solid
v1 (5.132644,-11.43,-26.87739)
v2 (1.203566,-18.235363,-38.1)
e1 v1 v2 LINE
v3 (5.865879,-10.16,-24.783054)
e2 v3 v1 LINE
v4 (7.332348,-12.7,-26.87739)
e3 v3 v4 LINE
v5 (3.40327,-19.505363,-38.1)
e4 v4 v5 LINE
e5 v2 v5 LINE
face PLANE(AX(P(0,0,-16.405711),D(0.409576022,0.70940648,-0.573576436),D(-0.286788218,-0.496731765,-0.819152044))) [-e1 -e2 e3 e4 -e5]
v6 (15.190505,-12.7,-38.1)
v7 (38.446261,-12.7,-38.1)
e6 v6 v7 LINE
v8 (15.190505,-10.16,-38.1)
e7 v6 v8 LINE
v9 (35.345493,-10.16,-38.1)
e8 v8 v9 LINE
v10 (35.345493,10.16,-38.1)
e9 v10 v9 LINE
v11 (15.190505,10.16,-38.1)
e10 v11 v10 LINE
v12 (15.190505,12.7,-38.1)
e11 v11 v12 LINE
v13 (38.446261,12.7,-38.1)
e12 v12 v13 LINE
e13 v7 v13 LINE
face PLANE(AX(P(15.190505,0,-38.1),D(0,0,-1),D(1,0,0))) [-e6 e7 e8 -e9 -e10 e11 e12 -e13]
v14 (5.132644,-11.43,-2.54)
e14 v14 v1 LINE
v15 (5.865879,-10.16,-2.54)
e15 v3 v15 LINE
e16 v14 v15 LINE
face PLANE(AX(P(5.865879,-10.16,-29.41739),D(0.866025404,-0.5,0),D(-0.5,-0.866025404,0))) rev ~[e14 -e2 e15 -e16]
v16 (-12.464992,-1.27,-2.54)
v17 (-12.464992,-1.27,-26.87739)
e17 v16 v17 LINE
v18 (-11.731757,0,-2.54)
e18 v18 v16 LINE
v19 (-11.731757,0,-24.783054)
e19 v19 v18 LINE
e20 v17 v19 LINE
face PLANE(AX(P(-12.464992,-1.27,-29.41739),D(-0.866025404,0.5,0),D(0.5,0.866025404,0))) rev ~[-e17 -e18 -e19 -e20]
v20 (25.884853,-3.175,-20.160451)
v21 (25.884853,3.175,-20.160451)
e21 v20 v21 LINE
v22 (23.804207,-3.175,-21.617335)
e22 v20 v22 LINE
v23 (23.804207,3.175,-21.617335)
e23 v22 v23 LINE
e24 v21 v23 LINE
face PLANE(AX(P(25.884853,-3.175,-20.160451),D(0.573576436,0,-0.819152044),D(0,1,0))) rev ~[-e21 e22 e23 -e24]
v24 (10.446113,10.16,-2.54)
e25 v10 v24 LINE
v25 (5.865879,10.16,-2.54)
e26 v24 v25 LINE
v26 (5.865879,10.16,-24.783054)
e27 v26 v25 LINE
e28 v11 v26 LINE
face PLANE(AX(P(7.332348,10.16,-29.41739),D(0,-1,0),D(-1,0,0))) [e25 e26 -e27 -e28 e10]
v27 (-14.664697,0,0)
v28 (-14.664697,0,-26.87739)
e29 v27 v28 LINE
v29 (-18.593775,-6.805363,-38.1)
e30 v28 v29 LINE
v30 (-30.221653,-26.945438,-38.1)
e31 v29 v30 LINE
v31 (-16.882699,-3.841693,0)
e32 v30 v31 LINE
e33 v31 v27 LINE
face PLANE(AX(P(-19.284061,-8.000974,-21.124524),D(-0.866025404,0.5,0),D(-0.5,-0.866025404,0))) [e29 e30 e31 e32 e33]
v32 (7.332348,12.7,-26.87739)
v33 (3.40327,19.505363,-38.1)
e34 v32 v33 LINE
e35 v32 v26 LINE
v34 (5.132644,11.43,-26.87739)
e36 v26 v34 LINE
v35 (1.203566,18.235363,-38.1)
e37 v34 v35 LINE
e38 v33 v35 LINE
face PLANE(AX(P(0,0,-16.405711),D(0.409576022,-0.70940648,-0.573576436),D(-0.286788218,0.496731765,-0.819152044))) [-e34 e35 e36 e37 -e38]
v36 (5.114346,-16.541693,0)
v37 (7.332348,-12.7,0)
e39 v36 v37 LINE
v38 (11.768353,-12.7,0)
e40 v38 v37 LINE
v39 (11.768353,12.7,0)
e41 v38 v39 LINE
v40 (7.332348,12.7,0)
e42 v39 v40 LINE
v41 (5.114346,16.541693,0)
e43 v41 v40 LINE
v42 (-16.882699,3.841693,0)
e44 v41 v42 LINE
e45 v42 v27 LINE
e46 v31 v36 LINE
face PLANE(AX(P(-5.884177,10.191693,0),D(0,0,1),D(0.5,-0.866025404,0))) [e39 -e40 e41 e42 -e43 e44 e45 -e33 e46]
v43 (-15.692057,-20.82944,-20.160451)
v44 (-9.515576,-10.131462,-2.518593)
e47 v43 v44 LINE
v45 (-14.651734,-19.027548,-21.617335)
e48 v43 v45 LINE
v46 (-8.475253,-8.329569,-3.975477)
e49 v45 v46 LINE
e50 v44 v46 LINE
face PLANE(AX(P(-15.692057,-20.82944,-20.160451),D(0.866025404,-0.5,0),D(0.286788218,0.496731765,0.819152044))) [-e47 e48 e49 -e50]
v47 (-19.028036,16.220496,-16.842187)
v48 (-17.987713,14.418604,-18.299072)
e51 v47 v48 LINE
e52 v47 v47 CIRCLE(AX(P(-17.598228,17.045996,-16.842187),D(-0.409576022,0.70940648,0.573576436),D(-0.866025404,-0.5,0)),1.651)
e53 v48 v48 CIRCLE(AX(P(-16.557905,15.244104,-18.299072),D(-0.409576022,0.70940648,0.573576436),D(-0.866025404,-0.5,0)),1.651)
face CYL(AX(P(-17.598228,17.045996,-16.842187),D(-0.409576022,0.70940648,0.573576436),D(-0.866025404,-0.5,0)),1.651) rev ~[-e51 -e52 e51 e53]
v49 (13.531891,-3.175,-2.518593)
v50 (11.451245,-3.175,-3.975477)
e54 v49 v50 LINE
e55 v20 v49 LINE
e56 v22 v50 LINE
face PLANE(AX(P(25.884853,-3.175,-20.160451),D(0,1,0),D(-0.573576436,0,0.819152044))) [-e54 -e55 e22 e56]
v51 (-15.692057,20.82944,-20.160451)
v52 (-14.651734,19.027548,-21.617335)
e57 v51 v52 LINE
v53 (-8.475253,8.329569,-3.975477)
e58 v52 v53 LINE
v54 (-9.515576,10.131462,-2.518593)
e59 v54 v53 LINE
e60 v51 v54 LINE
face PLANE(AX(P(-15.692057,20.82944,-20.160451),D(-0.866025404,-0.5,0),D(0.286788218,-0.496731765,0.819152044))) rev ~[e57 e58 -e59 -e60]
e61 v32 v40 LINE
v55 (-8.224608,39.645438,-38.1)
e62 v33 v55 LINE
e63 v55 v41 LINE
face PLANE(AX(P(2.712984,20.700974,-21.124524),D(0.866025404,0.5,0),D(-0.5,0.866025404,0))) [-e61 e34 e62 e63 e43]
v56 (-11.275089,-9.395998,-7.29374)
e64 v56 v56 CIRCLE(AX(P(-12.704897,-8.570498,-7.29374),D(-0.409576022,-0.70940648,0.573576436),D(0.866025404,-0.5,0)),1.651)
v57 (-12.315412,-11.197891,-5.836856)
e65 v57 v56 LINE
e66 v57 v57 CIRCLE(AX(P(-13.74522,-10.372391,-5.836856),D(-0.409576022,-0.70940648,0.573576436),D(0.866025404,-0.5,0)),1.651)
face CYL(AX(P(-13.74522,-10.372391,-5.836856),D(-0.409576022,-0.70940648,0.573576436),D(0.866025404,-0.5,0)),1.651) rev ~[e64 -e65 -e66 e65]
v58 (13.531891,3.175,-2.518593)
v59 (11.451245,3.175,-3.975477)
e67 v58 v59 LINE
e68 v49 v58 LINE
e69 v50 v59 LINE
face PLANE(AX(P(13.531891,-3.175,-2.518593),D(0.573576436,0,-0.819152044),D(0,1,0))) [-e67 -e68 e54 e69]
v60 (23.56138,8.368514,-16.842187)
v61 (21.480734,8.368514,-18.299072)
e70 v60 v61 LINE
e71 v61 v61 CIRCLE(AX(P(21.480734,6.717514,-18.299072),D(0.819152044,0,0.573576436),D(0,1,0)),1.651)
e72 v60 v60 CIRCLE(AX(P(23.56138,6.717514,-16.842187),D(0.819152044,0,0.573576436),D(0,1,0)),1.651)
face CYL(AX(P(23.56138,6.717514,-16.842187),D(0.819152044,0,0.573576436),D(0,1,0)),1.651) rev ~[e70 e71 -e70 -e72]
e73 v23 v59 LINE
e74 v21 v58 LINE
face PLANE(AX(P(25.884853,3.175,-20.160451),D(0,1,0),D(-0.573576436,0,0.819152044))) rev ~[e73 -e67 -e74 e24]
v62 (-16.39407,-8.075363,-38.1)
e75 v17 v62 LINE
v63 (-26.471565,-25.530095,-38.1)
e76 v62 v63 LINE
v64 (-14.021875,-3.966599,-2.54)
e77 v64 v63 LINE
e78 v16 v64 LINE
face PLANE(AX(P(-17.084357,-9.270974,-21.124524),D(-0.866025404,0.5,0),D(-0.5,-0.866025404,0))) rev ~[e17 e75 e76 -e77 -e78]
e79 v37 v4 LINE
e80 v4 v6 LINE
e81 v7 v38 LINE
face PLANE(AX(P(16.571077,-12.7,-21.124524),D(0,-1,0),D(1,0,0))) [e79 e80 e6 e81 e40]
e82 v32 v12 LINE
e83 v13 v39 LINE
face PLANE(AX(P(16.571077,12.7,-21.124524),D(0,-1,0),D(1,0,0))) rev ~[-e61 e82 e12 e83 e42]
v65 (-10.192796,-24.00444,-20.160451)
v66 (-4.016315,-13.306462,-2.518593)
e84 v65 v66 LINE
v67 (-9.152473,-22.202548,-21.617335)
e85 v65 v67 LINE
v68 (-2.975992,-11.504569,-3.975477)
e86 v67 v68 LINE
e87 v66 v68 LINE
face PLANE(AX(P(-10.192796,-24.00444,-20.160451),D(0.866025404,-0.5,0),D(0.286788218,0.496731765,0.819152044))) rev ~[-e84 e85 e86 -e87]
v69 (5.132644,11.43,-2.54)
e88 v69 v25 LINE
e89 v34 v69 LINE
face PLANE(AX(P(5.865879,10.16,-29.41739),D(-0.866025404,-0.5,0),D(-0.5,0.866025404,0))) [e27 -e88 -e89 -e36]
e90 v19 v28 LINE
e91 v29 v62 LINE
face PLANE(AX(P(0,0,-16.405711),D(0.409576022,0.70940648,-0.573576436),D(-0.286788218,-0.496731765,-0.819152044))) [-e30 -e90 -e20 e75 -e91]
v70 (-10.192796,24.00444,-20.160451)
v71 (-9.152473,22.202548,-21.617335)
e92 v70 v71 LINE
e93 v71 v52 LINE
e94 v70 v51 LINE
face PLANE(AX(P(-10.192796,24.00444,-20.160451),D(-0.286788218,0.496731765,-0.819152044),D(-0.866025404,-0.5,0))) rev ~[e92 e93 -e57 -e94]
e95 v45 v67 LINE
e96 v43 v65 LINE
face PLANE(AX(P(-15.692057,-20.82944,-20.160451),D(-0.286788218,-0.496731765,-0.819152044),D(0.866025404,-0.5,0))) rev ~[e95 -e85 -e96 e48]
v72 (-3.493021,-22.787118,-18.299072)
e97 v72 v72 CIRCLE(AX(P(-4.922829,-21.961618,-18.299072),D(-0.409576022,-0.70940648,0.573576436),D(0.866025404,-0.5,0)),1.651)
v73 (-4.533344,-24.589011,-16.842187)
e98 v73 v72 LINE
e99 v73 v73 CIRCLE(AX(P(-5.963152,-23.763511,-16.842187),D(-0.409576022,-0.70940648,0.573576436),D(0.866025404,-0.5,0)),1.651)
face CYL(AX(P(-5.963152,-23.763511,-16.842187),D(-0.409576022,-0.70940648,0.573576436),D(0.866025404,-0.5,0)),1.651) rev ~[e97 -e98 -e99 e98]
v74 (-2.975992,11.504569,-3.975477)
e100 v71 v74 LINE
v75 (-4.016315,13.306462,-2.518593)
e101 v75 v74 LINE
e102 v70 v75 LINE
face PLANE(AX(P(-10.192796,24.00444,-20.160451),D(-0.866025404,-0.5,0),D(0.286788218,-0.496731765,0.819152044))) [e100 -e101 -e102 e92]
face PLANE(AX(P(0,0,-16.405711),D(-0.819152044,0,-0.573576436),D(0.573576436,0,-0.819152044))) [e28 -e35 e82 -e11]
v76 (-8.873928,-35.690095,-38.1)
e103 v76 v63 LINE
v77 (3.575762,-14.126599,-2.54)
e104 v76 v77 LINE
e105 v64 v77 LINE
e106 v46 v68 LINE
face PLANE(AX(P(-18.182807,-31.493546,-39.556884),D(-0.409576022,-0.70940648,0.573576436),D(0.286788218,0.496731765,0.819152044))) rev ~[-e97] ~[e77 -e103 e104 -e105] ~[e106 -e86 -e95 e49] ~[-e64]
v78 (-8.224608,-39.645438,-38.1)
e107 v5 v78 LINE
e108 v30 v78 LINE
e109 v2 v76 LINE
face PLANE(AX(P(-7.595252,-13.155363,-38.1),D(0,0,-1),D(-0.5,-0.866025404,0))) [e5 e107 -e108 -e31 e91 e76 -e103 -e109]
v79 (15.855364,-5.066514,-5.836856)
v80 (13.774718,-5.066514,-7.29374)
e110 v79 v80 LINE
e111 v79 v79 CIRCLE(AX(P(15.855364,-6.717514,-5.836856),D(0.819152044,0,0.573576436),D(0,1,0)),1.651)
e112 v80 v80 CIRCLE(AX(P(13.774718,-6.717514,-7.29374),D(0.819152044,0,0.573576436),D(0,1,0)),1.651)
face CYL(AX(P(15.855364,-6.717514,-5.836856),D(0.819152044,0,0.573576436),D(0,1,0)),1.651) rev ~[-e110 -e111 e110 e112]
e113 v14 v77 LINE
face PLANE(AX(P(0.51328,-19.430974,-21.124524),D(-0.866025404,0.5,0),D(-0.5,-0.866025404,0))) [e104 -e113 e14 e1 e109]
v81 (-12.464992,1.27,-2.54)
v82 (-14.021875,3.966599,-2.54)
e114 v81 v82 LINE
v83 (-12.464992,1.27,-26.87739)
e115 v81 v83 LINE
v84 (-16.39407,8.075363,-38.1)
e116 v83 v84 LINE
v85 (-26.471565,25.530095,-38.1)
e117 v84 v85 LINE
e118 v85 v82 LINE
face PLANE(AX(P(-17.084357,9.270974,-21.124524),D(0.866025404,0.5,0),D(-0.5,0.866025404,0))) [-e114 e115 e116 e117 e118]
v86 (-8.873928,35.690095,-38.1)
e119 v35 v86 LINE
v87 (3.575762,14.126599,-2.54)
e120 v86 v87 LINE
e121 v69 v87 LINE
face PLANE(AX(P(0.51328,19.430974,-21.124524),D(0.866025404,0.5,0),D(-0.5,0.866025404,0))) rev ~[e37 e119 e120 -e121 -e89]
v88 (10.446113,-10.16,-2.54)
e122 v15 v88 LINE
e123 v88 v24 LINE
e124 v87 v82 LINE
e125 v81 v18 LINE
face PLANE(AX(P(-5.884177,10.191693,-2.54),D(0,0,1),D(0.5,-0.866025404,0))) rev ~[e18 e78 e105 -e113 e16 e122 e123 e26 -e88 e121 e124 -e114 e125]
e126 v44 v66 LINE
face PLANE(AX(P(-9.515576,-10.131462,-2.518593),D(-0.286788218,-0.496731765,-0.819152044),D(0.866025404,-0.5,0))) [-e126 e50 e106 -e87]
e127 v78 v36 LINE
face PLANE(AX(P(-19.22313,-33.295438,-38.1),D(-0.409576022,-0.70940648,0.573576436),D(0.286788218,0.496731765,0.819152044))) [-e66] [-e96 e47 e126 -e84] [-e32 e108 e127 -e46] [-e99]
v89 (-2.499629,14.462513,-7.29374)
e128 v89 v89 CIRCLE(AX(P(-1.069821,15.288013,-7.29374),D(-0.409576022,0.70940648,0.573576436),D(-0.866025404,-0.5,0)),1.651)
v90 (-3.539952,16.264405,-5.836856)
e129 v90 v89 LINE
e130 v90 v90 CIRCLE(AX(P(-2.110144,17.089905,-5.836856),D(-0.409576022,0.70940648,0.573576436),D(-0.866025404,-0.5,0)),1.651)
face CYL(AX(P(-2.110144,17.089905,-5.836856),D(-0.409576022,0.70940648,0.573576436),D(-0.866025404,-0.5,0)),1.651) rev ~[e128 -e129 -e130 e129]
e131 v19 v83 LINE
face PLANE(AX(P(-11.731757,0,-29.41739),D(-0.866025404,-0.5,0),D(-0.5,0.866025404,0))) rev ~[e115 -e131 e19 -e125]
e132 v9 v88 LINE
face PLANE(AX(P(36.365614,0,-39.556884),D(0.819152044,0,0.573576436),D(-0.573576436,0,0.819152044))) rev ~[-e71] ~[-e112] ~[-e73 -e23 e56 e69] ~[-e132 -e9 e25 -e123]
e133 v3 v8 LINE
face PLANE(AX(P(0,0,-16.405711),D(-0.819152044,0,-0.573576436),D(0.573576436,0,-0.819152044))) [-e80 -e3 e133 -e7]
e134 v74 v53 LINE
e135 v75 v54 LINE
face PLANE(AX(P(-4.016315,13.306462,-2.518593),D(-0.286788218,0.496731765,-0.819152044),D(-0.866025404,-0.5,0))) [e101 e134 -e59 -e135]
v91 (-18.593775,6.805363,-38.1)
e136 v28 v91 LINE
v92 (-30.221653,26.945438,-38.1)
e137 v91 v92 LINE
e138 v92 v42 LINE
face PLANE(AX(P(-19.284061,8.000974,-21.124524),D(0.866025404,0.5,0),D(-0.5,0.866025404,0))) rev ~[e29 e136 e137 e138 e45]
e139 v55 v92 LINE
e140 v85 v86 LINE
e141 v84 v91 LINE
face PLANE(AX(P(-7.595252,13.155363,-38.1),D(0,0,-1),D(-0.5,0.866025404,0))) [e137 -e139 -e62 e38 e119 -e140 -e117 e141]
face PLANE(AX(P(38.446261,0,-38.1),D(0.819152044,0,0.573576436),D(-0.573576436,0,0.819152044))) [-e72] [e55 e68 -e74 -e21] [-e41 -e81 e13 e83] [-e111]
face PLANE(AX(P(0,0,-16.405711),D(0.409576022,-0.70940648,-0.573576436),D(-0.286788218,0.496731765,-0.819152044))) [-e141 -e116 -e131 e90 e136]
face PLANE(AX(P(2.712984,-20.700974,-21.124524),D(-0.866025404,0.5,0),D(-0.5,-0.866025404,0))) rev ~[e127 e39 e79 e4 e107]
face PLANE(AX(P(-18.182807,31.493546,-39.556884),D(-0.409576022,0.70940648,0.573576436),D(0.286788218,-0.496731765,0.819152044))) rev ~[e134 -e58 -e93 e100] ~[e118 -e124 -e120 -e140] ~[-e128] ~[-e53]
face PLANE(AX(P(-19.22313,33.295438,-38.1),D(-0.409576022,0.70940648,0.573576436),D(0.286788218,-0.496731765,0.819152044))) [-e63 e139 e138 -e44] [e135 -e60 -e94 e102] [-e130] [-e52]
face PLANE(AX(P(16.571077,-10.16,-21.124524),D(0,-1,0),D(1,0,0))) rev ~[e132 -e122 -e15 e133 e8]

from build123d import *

# Parameters (mm, degrees)
F1_DEPTH        = 12.7
F3_COUNT        = 3
F4_T            = 2.54
F4_T3_DEPTH     = 31.9573897847
F5_W            = 6.35
F5_H            = 21.5367313986
F5_R            = 1.651
F6_DEPTH        = 2.54
F6_COPIES_COUNT = 3


# Not quite as in the source:
# - a pattern or mirror of a feature is missing from the dataset's text; its kind, count and spacing are read off the source's solid
# - a shell that OpenCascade refuses in one call is made with other operations: the cavity is built on its own and cut out


with BuildPart() as f1:
    # F0 (on Front) → F1 (new body, symmetric)
    with BuildSketch(Plane.XZ):
        Polygon((11.7683534, 0), (0, 0), (0, -16.4057110057), (15.1905046899, -38.1), (38.4462606058, -38.1), align=None)
    extrude(amount=F1_DEPTH, both=True)

    # F3: F1 ×3 about axis
    f3_axis = Axis((0, 0, -8.2028555029), (0, 0, -1))


with BuildPart() as f1_1:
    add(f1.part)
    for i in range(1, F3_COUNT):
        add(f1.part.rotate(f3_axis, i * 360 / F3_COUNT))

    # F4: shell of thickness 2.54, made by hand


with BuildPart() as f4_core1:
    # F4_t2: copy of F1
    add(f1_1.part)

    # the walls: a layer under each face that stays
    f4_faces = [f4_core1.faces().sort_by_distance(p)[0] for p in [
        (-2.557172964, 0, 0),
        (22.8893045122, -12.7, -19.05),
        (-0.4461296281, -26.1727191826, -19.05),
        (-12.5536535014, -21.7435656851, -19.05),
        (-22.4431748842, -13.4727191826, -19.05),
        (22.8893045122, 12.7, -19.05),
        (25.1073070029, 0, -19.05),
        (-22.4431748842, 13.4727191826, -19.05),
        (-0.4461296281, 26.1727191826, -19.05),
        (-12.5536535014, 21.7435656851, -19.05),
    ]]
    thicken(f4_faces, amount=-F4_T, mode=Mode.SUBTRACT)

    # F4_s4 → F4_t3 (cut)
    with BuildSketch(Plane.XY.offset(-29.4173897847)):
        Polygon((7.354345464, -12.7381), (7.3323484187, -10.16), (5.865878735, -10.16), (5.1326438931, -11.43), align=None)
        Polygon((-14.7086909279, 0), (-12.4649923118, -1.27), (-11.7317574699, 0), (-12.4649923118, 1.27), align=None)
        Polygon((7.354345464, 12.7381), (7.3323484187, 10.16), (5.865878735, 10.16), (5.1326438931, 11.43), align=None)
    extrude(amount=F4_T3_DEPTH, mode=Mode.SUBTRACT)


with BuildPart() as f1_2:
    add(f1_1.part)

    # what is left inside the walls is the cavity
    f4_cavity = [f4_core1.part.solids().sort_by_distance(p)[0] for p in [
        (22.874997, 3.386667, -20.334569),
    ]]
    add(f4_cavity, mode=Mode.SUBTRACT)

    # F5 (on face) → F6 (cut)
    with BuildSketch(Plane(origin=(7.8966836583, 0, 5.5293174244), x_dir=(0, 1, 0), z_dir=(0.8191520443, 0, 0.5735764364))):
        with Locations((0, -20.5930502049)):
            Rectangle(F5_W, F5_H)
        with Locations((6.7175144213, -27.3105646262)):
            Circle(F5_R)
        with Locations((-6.7175144213, -13.8755357836)):
            Circle(F5_R)
    f6 = extrude(amount=-F6_DEPTH, mode=Mode.SUBTRACT)

    # F6_copies: F6 ×3 about axis
    f6_copies_axis = Axis((0, 0, 0), (0, 0, 1))
    for i in range(1, F6_COPIES_COUNT):
        add(f6.rotate(f6_copies_axis, i * 360 / F6_COPIES_COUNT), mode=Mode.SUBTRACT)


solid = f1_2.part
